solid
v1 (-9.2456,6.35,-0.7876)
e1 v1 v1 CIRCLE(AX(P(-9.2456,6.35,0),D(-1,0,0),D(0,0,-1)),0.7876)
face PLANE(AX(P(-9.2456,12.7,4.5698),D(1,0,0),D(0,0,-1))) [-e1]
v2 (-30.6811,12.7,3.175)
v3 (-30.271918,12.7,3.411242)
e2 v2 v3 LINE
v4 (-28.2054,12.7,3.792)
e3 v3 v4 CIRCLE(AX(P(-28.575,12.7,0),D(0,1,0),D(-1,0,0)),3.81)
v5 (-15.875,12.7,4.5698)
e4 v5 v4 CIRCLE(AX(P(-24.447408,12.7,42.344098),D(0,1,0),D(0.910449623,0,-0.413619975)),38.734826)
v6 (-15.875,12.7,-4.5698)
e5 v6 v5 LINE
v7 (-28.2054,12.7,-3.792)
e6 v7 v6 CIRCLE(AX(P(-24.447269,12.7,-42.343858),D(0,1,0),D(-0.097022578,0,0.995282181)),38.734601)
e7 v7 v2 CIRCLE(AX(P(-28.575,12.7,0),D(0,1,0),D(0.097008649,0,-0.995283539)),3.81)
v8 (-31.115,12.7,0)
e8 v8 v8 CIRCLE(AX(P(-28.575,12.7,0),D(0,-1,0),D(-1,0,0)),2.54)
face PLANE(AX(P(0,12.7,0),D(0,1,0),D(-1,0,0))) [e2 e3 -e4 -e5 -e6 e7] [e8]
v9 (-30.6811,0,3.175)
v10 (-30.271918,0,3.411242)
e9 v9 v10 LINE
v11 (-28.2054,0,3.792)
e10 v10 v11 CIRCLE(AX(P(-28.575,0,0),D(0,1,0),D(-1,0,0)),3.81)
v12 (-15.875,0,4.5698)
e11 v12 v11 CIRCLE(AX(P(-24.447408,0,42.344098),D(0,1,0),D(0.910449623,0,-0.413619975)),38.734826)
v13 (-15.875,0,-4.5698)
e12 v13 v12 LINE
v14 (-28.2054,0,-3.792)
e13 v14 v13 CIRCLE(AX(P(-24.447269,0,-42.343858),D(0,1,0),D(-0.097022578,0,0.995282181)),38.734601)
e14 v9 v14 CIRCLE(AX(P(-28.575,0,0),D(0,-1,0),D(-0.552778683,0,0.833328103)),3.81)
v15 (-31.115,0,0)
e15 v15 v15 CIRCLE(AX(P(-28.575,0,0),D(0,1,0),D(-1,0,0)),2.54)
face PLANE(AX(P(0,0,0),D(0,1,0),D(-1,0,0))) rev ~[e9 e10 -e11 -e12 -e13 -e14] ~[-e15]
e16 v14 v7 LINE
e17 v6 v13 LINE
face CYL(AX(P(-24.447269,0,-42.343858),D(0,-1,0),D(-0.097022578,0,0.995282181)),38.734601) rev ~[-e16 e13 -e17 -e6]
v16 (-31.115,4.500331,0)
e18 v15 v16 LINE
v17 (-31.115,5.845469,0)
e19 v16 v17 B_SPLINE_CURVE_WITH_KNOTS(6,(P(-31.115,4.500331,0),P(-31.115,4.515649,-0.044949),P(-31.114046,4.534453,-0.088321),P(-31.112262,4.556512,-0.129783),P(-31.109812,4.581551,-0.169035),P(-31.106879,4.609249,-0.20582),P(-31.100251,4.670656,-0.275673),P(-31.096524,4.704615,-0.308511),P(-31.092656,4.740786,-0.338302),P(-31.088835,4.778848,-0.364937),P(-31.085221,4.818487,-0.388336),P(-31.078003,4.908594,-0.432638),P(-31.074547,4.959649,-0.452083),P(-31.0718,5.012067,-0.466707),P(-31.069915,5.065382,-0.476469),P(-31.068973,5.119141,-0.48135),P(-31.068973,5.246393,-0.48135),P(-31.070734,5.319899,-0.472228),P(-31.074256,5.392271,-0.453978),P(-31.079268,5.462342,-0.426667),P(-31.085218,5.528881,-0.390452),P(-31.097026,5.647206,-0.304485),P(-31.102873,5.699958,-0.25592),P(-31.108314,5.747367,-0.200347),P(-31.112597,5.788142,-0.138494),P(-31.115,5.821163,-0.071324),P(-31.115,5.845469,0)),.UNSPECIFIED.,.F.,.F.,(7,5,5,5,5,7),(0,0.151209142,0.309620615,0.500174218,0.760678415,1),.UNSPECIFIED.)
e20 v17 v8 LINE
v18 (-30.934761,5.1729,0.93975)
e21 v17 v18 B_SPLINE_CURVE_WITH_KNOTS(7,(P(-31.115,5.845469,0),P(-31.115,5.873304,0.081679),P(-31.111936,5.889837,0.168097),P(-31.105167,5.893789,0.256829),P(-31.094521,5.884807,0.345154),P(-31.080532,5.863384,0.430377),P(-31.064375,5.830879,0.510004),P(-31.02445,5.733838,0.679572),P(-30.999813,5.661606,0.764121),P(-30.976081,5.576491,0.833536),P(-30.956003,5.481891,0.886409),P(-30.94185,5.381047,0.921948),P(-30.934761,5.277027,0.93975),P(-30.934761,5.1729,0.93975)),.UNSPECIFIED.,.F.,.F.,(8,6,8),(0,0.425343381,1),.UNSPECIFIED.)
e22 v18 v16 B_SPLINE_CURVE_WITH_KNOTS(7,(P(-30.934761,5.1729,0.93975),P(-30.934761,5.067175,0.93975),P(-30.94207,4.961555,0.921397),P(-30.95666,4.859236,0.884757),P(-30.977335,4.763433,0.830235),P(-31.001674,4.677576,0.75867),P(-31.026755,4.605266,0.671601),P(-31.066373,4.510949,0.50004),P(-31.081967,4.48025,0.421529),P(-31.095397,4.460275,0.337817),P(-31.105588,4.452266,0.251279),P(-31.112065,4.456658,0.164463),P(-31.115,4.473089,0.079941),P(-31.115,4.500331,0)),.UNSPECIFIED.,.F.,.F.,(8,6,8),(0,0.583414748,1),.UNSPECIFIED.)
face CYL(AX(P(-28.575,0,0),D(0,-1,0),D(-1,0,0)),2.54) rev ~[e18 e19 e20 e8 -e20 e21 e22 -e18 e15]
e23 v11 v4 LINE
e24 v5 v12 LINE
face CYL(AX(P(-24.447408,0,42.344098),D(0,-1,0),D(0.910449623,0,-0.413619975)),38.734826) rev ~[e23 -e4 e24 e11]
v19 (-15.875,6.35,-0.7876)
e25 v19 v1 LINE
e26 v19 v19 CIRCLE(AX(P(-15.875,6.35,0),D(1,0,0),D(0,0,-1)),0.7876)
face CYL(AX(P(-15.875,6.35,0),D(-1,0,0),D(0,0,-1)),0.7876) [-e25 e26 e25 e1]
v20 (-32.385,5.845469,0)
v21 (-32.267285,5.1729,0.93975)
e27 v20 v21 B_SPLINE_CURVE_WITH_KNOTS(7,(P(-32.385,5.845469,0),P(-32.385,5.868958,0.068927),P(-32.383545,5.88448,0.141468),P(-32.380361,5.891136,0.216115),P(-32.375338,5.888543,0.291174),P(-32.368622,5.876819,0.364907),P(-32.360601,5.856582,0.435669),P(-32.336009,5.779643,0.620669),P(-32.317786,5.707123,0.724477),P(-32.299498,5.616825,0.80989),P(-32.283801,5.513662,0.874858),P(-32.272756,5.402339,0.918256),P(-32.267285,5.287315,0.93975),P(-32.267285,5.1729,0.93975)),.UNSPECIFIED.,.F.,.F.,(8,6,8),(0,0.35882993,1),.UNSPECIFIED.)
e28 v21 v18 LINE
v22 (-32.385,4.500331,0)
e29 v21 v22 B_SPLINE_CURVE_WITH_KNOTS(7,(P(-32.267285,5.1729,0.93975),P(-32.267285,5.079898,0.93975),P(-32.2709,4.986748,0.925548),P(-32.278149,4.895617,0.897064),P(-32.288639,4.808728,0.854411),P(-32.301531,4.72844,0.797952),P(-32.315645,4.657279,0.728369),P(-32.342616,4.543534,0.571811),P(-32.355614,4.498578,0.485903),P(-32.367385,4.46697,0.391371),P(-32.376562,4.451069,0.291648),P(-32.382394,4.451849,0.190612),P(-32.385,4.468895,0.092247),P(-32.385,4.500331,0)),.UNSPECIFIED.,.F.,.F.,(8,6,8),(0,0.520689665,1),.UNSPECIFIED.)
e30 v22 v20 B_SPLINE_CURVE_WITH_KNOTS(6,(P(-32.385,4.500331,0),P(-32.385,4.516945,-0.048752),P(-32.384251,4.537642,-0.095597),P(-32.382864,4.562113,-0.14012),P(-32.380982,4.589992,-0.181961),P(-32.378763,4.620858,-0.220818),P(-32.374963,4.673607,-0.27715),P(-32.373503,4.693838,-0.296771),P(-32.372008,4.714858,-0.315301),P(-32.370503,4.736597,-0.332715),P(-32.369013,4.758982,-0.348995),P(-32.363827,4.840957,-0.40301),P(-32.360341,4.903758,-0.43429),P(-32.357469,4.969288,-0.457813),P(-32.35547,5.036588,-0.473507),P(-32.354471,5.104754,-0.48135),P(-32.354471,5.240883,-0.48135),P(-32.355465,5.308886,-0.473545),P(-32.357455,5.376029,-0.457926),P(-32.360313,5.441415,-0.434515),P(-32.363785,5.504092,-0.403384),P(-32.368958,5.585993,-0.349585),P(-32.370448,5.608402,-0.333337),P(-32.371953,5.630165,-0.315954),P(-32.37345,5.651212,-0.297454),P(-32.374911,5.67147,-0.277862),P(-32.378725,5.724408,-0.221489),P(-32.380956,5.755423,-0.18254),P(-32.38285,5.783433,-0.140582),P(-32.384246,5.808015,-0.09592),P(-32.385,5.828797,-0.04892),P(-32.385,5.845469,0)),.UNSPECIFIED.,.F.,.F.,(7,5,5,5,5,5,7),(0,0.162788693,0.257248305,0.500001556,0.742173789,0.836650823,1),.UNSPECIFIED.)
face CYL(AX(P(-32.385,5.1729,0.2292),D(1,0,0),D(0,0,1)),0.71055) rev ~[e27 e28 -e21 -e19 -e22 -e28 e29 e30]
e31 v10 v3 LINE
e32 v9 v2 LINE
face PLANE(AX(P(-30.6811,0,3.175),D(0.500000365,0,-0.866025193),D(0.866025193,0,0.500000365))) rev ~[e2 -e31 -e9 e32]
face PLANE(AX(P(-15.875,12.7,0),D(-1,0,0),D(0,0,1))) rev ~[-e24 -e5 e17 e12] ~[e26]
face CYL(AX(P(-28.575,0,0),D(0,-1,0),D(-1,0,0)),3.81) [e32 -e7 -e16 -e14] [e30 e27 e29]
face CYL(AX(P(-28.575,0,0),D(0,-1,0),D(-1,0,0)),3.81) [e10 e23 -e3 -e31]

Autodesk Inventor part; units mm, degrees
ref_plane "YZ Plane" through (0, 0, 0) normal (1, 0, 0) x (0, 1, 0)
ref_plane "XZ Plane" through (0, 0, 0) normal (0, 1, 0) x (-1, 0, 0)
sketch "Sketch1" plane through (0, 0, 0) normal (0, 1, 0) x (-1, 0, 0)
  line L0 (0, 0) -> (28.575, 0)
  line L1 (28.575, 0) -> (0, 0)
  line L2 (0, 0) -> (-14.2875, -24.7467)
  line L3 (0, 0) -> (28.575, 0) construction
  line L4 (0, 0) -> (-14.2875, 24.7467)
  line L5 (0, 0) -> (28.575, 0) construction
  circle A0 centre (28.575, 0) radius 2.54
  circle A1 centre (-14.2875, -24.7467) radius 2.54
  circle A2 centre (-14.2875, 24.7467) radius 2.54
  circle A3 centre (0, 0) radius 3.175
  circle A4 centre (0, 0) radius 6.35
  line L6 (-1.5875, -2.7496) -> (0, 0)
  line L7 (0, 0) -> (-6.35, 0)
  circle A5 centre (-14.2875, 24.7467) radius 3.81
  circle A6 centre (28.575, 0) radius 3.81
  circle A7 centre (-14.2875, -24.7467) radius 3.81
  line L8 (30.6811, 3.175) -> (-12.1814, 27.9217)
  line L9 (28.2054, -3.792) -> (-10.8187, -26.3226)
  line L10 (-18.0975, 24.7467) -> (-18.0975, -24.7467)
  line L11 (0, 0) -> (5.0525, -8.8146)
  line L12 (0, 0) -> (5.1463, 8.7602)
  line L13 (0, 0) -> (-10.16, 0)
  arc A8 (28.2054, -3.792) -> (-10.8187, -26.3226) centre (24.4473, -42.344) ccw
  arc A9 (-10.8187, 26.3226) -> (28.2054, 3.792) centre (24.4473, 42.344) ccw
  arc A10 (-17.3867, -22.5305) -> (-17.3867, 22.5305) centre (-48.8947, 0) ccw
  point P0 (5.1074, 8.7829)
  point P1 (-10.16, 0.0317)
  point P2 (30.2716, 3.4114)
  point P3 (28.2054, 3.792)
  point P4 (-10.8187, 26.3226)
  point P5 (-17.3867, 22.5305)
  point P6 (-17.3867, -22.5305)
  dimension "d9" = 6.35
  dimension "d41" = 12.7
  dimension "d0" = 28.575
  dimension "d1" = 28.575
  dimension "d2" = 120
  dimension "d3" = 28.575
  dimension "d4" = 120
  dimension "d5" = 5.08
  dimension "d6" = 5.08
  dimension "d7" = 5.08
  dimension "d42" = 7.62
  dimension "d43" = 7.62
  dimension "d44" = 7.62
  dimension "d47" = 10.16
  dimension "d48" = 10.16
  dimension "d49" = 10.16
  dimension "d52" = 360
extrude "Extrusion4" add sketch "Sketch1" along normal blind 12.7 contours A3 L12 A4 L0 | L0 A4 L11 A3 | A3 L11 A4 L2 | L2 A4 L7 A3 | A3 L7 A4 L4 | L4 A4 L12 A3 | A4 L12 A9 A6 L0 | L0 A6 A8 L11 A4 | A4 L11 A8 A7 L2 | L2 A7 A10 L13 A4 | A4 L13 A10 A5 L4 | L4 A5 A9 L12 A4 | A6 L8 | A7 | A5 picked at (31.8987, 0.5122)
sketch "Sketch8" plane through (0, 12.7, 0) normal (0, 1, 0) x (1, 0, 0)
  circle A0 centre (0.678, -11.6167) radius 3.175 projected
  circle A1 centre (9.1268, -7.2186) radius 3.175 projected
  circle A2 centre (0.678, -11.6167) radius 3.175 projected
  circle A3 centre (9.1268, -7.2186) radius 3.175 projected
  line L0 (5.0649, -17.2561) -> (12.4117, -13.0144)
  arc A4 (17.3867, 22.5305) -> (17.3867, -22.5305) centre (48.8947, 0) ccw projected
  circle A5 centre (14.2875, -24.7467) radius 2.54 projected
  line L1 (0, 0) -> (14.2875, -24.7467)
  arc A6 (10.8187, -26.3226) -> (-28.2054, -3.792) centre (-24.4473, -42.344) ccw projected
  arc A7 (10.8187, -26.3226) -> (17.3867, -22.5305) centre (14.2875, -24.7467) ccw projected
  line L2 (9.1268, -7.2186) -> (10.7143, -9.9682)
  line L3 (9.1268, -7.2186) -> (7.5393, -4.4689)
  line L4 (0.678, -11.6167) -> (-0.9095, -8.867)
  line L5 (0.678, -11.6167) -> (2.2655, -14.3663)
  line L6 (-0.9095, -8.867) -> (-4.4671, -10.921)
  line L7 (2.2655, -14.3663) -> (-2.6369, -17.1967)
  line L8 (7.5393, -4.4689) -> (12.4407, -1.6391)
  line L9 (10.7143, -9.9682) -> (17.8581, -5.8438)
  point P0 (11.3663, -9.5918)
  point P1 (11.3414, -9.4937)
  point P2 (10.4005, -4.3102)
  point P3 (10.2682, -2.8934)
  point P4 (-0.9095, -8.867)
  point P5 (-3.012, -10.0809)
  point P6 (2.1732, -14.2063)
extrude "Extrusion5" cut sketch "Sketch8" against normal through all contours A0 A6 L5 L4 | L4 L5 A6 A0 | A0 A6 L6 | A0 L5 A6 | L3 L2 A1 | L8 A4 A1 | A1 A4 L2 L3 | A1 A4 L9 | A1 A4 picked at (2.2194, -14.2744)
sketch "Sketch11" plane through (0, 12.7, 0) normal (0, 1, 0) x (1, 0, 0)
  arc A0 (10.8187, -26.3226) -> (2.3124, -14.3387) centre (-24.4473, -42.344) ccw projected
  arc A1 (11.3663, -9.5918) -> (17.3867, -22.5305) centre (48.8947, 0) ccw projected
  arc A2 (10.8187, -26.3226) -> (17.3867, -22.5305) centre (14.2875, -24.7467) ccw projected
  line L0 (0, 0) -> (14.2875, -24.7467)
  circle A3 centre (14.2875, -24.7467) radius 2.54 projected
  line L1 (14.2875, -24.7467) -> (8.2579, -14.3032)
  line L2 (14.2875, -24.7467) -> (7.9375, -13.7482)
  line L3 (7.9375, -13.7482) -> (11.895, -11.4633)
  line L4 (7.9375, -13.7482) -> (3.98, -16.033)
  circle A4 centre (14.2875, 24.7467) radius 2.54 projected
  line L5 (0, 0) -> (14.2875, 24.7467)
  line L6 (14.2875, 24.7467) -> (7.9375, 13.7482)
  line L7 (7.9375, 13.7482) -> (0, 0)
  circle A5 centre (-28.575, 0) radius 2.54 projected
  line L8 (0, 0) -> (-28.575, 0)
  line L9 (-28.575, 0) -> (-15.875, 0)
  line L10 (-15.875, 0) -> (-15.875, 4.5698)
  arc A6 (-28.2054, 3.792) -> (10.8187, 26.3226) centre (-24.4473, 42.344) ccw projected
  line L11 (-15.875, 0) -> (-15.875, -4.5698)
  line L12 (7.9375, 13.7482) -> (3.98, 16.033)
  line L13 (7.9375, 13.7482) -> (11.895, 11.4633)
  arc A7 (17.3867, 22.5305) -> (10.2682, -2.8934) centre (48.8947, 0) ccw projected
  arc A8 (-28.2054, 3.792) -> (-30.6811, -3.175) centre (-28.575, 0) ccw projected
  arc A9 (-3.012, -10.0809) -> (-28.2054, -3.792) centre (-24.4473, -42.344) ccw projected
  arc A10 (-30.2716, -3.4114) -> (-28.2054, -3.792) centre (-28.575, 0) ccw projected
  line L14 (-30.6811, -3.175) -> (-30.2716, -3.4114) projected
  arc A11 (17.3867, 22.5305) -> (10.8187, 26.3226) centre (14.2875, 24.7467) ccw projected
  line L15 (-3.012, -10.0809) -> (-0.9095, -8.867) projected
  arc A12 (2.3124, -14.3387) -> (-0.9095, -8.867) centre (0.678, -11.6167) ccw projected
  arc A13 (7.5393, -4.4689) -> (10.7143, -9.9682) centre (9.1268, -7.2186) ccw projected
  line L16 (11.3663, -9.5918) -> (10.7143, -9.9682) projected
  line L17 (7.5393, -4.4689) -> (10.2682, -2.8934) projected
  dimension "d65" = 12.7
  dimension "d66" = 12.7
  dimension "d67" = 12.7
extrude "Extrusion6" cut sketch "Sketch11" against normal blind 12.7 contours A0 A12 L15 A9 L11 L8 L0 L4 | L0 L5 L13 A7 L17 A13 L16 A1 L3 | L8 L10 A6 L12 L5
sketch "Sketch13" plane through (0, 12.7, 0) normal (0, 1, 0) x (1, 0, 0)
  arc A0 (-28.2054, 3.792) -> (-15.875, 4.5698) centre (-24.4473, 42.344) ccw projected
  arc A1 (-15.875, -4.5698) -> (-28.2054, -3.792) centre (-24.4473, -42.344) ccw projected
  line L0 (-15.875, -4.5698) -> (-15.875, 4.5698) projected
  arc A2 (-30.2716, -3.4114) -> (-28.2054, -3.792) centre (-28.575, 0) ccw projected
  arc A3 (-28.2054, 3.792) -> (-30.6811, -3.175) centre (-28.575, 0) ccw projected
  arc A4 (17.3867, 22.5305) -> (11.895, 11.4633) centre (48.8947, 0) ccw projected
  line L1 (3.98, 16.033) -> (11.895, 11.4633) projected
  arc A5 (3.98, 16.033) -> (10.8187, 26.3226) centre (-24.4473, 42.344) ccw projected
  arc A6 (17.3867, 22.5305) -> (10.8187, 26.3226) centre (14.2875, 24.7467) ccw projected
  arc A7 (11.895, -11.4633) -> (17.3867, -22.5305) centre (48.8947, 0) ccw projected
  line L2 (11.895, -11.4633) -> (3.98, -16.033) projected
  arc A8 (10.8187, -26.3226) -> (3.98, -16.033) centre (-24.4473, -42.344) ccw projected
  arc A9 (10.8187, -26.3226) -> (17.3867, -22.5305) centre (14.2875, -24.7467) ccw projected
  point P0 (0, 0)
extrude "Extrusion7" cut sketch "Sketch13" against normal blind 12.7
sketch "Sketch14" plane through (-15.875, 12.7, 4.5698) normal (1, 0, 0) x (0, 0, -1)
  line L0 (0, -12.7) -> (0, 0) projected
  line L1 (0, -6.35) -> (9.1395, -6.35)
  line L2 (9.1395, 0) -> (9.1395, -12.7) projected
  line L3 (2.0298, 0) -> (7.1098, 0) projected
  line L4 (4.5698, 0) -> (4.5698, -12.7)
  circle A0 centre (4.5698, -6.35) radius 0.7876
extrude "Extrusion8" add sketch "Sketch14" along normal blind 6.6294
thread "Thread1" size "2-56 UNC" class "2A" standard "ANSI Unified Screw Threads" full length
ref_plane "Work Plane1" through (-32.385, 0, 0) normal (1, 0, 0) x (0, 1, 0)
sketch "Sketch23" plane through (-32.385, 0, 0) normal (1, 0, 0) x (0, 1, 0)
  point P0 (0, 0)
  point P1 (5.1729, 0.2292)
hole "Hole5" at (-32.385, 5.1729, 0.2292) direction (1, 0, 0) diameter 1.4211 depth 5.715 thread size "M1.8x0.35" class "6H" standard "ISO Metric profile"
properties part number "backupstability"
